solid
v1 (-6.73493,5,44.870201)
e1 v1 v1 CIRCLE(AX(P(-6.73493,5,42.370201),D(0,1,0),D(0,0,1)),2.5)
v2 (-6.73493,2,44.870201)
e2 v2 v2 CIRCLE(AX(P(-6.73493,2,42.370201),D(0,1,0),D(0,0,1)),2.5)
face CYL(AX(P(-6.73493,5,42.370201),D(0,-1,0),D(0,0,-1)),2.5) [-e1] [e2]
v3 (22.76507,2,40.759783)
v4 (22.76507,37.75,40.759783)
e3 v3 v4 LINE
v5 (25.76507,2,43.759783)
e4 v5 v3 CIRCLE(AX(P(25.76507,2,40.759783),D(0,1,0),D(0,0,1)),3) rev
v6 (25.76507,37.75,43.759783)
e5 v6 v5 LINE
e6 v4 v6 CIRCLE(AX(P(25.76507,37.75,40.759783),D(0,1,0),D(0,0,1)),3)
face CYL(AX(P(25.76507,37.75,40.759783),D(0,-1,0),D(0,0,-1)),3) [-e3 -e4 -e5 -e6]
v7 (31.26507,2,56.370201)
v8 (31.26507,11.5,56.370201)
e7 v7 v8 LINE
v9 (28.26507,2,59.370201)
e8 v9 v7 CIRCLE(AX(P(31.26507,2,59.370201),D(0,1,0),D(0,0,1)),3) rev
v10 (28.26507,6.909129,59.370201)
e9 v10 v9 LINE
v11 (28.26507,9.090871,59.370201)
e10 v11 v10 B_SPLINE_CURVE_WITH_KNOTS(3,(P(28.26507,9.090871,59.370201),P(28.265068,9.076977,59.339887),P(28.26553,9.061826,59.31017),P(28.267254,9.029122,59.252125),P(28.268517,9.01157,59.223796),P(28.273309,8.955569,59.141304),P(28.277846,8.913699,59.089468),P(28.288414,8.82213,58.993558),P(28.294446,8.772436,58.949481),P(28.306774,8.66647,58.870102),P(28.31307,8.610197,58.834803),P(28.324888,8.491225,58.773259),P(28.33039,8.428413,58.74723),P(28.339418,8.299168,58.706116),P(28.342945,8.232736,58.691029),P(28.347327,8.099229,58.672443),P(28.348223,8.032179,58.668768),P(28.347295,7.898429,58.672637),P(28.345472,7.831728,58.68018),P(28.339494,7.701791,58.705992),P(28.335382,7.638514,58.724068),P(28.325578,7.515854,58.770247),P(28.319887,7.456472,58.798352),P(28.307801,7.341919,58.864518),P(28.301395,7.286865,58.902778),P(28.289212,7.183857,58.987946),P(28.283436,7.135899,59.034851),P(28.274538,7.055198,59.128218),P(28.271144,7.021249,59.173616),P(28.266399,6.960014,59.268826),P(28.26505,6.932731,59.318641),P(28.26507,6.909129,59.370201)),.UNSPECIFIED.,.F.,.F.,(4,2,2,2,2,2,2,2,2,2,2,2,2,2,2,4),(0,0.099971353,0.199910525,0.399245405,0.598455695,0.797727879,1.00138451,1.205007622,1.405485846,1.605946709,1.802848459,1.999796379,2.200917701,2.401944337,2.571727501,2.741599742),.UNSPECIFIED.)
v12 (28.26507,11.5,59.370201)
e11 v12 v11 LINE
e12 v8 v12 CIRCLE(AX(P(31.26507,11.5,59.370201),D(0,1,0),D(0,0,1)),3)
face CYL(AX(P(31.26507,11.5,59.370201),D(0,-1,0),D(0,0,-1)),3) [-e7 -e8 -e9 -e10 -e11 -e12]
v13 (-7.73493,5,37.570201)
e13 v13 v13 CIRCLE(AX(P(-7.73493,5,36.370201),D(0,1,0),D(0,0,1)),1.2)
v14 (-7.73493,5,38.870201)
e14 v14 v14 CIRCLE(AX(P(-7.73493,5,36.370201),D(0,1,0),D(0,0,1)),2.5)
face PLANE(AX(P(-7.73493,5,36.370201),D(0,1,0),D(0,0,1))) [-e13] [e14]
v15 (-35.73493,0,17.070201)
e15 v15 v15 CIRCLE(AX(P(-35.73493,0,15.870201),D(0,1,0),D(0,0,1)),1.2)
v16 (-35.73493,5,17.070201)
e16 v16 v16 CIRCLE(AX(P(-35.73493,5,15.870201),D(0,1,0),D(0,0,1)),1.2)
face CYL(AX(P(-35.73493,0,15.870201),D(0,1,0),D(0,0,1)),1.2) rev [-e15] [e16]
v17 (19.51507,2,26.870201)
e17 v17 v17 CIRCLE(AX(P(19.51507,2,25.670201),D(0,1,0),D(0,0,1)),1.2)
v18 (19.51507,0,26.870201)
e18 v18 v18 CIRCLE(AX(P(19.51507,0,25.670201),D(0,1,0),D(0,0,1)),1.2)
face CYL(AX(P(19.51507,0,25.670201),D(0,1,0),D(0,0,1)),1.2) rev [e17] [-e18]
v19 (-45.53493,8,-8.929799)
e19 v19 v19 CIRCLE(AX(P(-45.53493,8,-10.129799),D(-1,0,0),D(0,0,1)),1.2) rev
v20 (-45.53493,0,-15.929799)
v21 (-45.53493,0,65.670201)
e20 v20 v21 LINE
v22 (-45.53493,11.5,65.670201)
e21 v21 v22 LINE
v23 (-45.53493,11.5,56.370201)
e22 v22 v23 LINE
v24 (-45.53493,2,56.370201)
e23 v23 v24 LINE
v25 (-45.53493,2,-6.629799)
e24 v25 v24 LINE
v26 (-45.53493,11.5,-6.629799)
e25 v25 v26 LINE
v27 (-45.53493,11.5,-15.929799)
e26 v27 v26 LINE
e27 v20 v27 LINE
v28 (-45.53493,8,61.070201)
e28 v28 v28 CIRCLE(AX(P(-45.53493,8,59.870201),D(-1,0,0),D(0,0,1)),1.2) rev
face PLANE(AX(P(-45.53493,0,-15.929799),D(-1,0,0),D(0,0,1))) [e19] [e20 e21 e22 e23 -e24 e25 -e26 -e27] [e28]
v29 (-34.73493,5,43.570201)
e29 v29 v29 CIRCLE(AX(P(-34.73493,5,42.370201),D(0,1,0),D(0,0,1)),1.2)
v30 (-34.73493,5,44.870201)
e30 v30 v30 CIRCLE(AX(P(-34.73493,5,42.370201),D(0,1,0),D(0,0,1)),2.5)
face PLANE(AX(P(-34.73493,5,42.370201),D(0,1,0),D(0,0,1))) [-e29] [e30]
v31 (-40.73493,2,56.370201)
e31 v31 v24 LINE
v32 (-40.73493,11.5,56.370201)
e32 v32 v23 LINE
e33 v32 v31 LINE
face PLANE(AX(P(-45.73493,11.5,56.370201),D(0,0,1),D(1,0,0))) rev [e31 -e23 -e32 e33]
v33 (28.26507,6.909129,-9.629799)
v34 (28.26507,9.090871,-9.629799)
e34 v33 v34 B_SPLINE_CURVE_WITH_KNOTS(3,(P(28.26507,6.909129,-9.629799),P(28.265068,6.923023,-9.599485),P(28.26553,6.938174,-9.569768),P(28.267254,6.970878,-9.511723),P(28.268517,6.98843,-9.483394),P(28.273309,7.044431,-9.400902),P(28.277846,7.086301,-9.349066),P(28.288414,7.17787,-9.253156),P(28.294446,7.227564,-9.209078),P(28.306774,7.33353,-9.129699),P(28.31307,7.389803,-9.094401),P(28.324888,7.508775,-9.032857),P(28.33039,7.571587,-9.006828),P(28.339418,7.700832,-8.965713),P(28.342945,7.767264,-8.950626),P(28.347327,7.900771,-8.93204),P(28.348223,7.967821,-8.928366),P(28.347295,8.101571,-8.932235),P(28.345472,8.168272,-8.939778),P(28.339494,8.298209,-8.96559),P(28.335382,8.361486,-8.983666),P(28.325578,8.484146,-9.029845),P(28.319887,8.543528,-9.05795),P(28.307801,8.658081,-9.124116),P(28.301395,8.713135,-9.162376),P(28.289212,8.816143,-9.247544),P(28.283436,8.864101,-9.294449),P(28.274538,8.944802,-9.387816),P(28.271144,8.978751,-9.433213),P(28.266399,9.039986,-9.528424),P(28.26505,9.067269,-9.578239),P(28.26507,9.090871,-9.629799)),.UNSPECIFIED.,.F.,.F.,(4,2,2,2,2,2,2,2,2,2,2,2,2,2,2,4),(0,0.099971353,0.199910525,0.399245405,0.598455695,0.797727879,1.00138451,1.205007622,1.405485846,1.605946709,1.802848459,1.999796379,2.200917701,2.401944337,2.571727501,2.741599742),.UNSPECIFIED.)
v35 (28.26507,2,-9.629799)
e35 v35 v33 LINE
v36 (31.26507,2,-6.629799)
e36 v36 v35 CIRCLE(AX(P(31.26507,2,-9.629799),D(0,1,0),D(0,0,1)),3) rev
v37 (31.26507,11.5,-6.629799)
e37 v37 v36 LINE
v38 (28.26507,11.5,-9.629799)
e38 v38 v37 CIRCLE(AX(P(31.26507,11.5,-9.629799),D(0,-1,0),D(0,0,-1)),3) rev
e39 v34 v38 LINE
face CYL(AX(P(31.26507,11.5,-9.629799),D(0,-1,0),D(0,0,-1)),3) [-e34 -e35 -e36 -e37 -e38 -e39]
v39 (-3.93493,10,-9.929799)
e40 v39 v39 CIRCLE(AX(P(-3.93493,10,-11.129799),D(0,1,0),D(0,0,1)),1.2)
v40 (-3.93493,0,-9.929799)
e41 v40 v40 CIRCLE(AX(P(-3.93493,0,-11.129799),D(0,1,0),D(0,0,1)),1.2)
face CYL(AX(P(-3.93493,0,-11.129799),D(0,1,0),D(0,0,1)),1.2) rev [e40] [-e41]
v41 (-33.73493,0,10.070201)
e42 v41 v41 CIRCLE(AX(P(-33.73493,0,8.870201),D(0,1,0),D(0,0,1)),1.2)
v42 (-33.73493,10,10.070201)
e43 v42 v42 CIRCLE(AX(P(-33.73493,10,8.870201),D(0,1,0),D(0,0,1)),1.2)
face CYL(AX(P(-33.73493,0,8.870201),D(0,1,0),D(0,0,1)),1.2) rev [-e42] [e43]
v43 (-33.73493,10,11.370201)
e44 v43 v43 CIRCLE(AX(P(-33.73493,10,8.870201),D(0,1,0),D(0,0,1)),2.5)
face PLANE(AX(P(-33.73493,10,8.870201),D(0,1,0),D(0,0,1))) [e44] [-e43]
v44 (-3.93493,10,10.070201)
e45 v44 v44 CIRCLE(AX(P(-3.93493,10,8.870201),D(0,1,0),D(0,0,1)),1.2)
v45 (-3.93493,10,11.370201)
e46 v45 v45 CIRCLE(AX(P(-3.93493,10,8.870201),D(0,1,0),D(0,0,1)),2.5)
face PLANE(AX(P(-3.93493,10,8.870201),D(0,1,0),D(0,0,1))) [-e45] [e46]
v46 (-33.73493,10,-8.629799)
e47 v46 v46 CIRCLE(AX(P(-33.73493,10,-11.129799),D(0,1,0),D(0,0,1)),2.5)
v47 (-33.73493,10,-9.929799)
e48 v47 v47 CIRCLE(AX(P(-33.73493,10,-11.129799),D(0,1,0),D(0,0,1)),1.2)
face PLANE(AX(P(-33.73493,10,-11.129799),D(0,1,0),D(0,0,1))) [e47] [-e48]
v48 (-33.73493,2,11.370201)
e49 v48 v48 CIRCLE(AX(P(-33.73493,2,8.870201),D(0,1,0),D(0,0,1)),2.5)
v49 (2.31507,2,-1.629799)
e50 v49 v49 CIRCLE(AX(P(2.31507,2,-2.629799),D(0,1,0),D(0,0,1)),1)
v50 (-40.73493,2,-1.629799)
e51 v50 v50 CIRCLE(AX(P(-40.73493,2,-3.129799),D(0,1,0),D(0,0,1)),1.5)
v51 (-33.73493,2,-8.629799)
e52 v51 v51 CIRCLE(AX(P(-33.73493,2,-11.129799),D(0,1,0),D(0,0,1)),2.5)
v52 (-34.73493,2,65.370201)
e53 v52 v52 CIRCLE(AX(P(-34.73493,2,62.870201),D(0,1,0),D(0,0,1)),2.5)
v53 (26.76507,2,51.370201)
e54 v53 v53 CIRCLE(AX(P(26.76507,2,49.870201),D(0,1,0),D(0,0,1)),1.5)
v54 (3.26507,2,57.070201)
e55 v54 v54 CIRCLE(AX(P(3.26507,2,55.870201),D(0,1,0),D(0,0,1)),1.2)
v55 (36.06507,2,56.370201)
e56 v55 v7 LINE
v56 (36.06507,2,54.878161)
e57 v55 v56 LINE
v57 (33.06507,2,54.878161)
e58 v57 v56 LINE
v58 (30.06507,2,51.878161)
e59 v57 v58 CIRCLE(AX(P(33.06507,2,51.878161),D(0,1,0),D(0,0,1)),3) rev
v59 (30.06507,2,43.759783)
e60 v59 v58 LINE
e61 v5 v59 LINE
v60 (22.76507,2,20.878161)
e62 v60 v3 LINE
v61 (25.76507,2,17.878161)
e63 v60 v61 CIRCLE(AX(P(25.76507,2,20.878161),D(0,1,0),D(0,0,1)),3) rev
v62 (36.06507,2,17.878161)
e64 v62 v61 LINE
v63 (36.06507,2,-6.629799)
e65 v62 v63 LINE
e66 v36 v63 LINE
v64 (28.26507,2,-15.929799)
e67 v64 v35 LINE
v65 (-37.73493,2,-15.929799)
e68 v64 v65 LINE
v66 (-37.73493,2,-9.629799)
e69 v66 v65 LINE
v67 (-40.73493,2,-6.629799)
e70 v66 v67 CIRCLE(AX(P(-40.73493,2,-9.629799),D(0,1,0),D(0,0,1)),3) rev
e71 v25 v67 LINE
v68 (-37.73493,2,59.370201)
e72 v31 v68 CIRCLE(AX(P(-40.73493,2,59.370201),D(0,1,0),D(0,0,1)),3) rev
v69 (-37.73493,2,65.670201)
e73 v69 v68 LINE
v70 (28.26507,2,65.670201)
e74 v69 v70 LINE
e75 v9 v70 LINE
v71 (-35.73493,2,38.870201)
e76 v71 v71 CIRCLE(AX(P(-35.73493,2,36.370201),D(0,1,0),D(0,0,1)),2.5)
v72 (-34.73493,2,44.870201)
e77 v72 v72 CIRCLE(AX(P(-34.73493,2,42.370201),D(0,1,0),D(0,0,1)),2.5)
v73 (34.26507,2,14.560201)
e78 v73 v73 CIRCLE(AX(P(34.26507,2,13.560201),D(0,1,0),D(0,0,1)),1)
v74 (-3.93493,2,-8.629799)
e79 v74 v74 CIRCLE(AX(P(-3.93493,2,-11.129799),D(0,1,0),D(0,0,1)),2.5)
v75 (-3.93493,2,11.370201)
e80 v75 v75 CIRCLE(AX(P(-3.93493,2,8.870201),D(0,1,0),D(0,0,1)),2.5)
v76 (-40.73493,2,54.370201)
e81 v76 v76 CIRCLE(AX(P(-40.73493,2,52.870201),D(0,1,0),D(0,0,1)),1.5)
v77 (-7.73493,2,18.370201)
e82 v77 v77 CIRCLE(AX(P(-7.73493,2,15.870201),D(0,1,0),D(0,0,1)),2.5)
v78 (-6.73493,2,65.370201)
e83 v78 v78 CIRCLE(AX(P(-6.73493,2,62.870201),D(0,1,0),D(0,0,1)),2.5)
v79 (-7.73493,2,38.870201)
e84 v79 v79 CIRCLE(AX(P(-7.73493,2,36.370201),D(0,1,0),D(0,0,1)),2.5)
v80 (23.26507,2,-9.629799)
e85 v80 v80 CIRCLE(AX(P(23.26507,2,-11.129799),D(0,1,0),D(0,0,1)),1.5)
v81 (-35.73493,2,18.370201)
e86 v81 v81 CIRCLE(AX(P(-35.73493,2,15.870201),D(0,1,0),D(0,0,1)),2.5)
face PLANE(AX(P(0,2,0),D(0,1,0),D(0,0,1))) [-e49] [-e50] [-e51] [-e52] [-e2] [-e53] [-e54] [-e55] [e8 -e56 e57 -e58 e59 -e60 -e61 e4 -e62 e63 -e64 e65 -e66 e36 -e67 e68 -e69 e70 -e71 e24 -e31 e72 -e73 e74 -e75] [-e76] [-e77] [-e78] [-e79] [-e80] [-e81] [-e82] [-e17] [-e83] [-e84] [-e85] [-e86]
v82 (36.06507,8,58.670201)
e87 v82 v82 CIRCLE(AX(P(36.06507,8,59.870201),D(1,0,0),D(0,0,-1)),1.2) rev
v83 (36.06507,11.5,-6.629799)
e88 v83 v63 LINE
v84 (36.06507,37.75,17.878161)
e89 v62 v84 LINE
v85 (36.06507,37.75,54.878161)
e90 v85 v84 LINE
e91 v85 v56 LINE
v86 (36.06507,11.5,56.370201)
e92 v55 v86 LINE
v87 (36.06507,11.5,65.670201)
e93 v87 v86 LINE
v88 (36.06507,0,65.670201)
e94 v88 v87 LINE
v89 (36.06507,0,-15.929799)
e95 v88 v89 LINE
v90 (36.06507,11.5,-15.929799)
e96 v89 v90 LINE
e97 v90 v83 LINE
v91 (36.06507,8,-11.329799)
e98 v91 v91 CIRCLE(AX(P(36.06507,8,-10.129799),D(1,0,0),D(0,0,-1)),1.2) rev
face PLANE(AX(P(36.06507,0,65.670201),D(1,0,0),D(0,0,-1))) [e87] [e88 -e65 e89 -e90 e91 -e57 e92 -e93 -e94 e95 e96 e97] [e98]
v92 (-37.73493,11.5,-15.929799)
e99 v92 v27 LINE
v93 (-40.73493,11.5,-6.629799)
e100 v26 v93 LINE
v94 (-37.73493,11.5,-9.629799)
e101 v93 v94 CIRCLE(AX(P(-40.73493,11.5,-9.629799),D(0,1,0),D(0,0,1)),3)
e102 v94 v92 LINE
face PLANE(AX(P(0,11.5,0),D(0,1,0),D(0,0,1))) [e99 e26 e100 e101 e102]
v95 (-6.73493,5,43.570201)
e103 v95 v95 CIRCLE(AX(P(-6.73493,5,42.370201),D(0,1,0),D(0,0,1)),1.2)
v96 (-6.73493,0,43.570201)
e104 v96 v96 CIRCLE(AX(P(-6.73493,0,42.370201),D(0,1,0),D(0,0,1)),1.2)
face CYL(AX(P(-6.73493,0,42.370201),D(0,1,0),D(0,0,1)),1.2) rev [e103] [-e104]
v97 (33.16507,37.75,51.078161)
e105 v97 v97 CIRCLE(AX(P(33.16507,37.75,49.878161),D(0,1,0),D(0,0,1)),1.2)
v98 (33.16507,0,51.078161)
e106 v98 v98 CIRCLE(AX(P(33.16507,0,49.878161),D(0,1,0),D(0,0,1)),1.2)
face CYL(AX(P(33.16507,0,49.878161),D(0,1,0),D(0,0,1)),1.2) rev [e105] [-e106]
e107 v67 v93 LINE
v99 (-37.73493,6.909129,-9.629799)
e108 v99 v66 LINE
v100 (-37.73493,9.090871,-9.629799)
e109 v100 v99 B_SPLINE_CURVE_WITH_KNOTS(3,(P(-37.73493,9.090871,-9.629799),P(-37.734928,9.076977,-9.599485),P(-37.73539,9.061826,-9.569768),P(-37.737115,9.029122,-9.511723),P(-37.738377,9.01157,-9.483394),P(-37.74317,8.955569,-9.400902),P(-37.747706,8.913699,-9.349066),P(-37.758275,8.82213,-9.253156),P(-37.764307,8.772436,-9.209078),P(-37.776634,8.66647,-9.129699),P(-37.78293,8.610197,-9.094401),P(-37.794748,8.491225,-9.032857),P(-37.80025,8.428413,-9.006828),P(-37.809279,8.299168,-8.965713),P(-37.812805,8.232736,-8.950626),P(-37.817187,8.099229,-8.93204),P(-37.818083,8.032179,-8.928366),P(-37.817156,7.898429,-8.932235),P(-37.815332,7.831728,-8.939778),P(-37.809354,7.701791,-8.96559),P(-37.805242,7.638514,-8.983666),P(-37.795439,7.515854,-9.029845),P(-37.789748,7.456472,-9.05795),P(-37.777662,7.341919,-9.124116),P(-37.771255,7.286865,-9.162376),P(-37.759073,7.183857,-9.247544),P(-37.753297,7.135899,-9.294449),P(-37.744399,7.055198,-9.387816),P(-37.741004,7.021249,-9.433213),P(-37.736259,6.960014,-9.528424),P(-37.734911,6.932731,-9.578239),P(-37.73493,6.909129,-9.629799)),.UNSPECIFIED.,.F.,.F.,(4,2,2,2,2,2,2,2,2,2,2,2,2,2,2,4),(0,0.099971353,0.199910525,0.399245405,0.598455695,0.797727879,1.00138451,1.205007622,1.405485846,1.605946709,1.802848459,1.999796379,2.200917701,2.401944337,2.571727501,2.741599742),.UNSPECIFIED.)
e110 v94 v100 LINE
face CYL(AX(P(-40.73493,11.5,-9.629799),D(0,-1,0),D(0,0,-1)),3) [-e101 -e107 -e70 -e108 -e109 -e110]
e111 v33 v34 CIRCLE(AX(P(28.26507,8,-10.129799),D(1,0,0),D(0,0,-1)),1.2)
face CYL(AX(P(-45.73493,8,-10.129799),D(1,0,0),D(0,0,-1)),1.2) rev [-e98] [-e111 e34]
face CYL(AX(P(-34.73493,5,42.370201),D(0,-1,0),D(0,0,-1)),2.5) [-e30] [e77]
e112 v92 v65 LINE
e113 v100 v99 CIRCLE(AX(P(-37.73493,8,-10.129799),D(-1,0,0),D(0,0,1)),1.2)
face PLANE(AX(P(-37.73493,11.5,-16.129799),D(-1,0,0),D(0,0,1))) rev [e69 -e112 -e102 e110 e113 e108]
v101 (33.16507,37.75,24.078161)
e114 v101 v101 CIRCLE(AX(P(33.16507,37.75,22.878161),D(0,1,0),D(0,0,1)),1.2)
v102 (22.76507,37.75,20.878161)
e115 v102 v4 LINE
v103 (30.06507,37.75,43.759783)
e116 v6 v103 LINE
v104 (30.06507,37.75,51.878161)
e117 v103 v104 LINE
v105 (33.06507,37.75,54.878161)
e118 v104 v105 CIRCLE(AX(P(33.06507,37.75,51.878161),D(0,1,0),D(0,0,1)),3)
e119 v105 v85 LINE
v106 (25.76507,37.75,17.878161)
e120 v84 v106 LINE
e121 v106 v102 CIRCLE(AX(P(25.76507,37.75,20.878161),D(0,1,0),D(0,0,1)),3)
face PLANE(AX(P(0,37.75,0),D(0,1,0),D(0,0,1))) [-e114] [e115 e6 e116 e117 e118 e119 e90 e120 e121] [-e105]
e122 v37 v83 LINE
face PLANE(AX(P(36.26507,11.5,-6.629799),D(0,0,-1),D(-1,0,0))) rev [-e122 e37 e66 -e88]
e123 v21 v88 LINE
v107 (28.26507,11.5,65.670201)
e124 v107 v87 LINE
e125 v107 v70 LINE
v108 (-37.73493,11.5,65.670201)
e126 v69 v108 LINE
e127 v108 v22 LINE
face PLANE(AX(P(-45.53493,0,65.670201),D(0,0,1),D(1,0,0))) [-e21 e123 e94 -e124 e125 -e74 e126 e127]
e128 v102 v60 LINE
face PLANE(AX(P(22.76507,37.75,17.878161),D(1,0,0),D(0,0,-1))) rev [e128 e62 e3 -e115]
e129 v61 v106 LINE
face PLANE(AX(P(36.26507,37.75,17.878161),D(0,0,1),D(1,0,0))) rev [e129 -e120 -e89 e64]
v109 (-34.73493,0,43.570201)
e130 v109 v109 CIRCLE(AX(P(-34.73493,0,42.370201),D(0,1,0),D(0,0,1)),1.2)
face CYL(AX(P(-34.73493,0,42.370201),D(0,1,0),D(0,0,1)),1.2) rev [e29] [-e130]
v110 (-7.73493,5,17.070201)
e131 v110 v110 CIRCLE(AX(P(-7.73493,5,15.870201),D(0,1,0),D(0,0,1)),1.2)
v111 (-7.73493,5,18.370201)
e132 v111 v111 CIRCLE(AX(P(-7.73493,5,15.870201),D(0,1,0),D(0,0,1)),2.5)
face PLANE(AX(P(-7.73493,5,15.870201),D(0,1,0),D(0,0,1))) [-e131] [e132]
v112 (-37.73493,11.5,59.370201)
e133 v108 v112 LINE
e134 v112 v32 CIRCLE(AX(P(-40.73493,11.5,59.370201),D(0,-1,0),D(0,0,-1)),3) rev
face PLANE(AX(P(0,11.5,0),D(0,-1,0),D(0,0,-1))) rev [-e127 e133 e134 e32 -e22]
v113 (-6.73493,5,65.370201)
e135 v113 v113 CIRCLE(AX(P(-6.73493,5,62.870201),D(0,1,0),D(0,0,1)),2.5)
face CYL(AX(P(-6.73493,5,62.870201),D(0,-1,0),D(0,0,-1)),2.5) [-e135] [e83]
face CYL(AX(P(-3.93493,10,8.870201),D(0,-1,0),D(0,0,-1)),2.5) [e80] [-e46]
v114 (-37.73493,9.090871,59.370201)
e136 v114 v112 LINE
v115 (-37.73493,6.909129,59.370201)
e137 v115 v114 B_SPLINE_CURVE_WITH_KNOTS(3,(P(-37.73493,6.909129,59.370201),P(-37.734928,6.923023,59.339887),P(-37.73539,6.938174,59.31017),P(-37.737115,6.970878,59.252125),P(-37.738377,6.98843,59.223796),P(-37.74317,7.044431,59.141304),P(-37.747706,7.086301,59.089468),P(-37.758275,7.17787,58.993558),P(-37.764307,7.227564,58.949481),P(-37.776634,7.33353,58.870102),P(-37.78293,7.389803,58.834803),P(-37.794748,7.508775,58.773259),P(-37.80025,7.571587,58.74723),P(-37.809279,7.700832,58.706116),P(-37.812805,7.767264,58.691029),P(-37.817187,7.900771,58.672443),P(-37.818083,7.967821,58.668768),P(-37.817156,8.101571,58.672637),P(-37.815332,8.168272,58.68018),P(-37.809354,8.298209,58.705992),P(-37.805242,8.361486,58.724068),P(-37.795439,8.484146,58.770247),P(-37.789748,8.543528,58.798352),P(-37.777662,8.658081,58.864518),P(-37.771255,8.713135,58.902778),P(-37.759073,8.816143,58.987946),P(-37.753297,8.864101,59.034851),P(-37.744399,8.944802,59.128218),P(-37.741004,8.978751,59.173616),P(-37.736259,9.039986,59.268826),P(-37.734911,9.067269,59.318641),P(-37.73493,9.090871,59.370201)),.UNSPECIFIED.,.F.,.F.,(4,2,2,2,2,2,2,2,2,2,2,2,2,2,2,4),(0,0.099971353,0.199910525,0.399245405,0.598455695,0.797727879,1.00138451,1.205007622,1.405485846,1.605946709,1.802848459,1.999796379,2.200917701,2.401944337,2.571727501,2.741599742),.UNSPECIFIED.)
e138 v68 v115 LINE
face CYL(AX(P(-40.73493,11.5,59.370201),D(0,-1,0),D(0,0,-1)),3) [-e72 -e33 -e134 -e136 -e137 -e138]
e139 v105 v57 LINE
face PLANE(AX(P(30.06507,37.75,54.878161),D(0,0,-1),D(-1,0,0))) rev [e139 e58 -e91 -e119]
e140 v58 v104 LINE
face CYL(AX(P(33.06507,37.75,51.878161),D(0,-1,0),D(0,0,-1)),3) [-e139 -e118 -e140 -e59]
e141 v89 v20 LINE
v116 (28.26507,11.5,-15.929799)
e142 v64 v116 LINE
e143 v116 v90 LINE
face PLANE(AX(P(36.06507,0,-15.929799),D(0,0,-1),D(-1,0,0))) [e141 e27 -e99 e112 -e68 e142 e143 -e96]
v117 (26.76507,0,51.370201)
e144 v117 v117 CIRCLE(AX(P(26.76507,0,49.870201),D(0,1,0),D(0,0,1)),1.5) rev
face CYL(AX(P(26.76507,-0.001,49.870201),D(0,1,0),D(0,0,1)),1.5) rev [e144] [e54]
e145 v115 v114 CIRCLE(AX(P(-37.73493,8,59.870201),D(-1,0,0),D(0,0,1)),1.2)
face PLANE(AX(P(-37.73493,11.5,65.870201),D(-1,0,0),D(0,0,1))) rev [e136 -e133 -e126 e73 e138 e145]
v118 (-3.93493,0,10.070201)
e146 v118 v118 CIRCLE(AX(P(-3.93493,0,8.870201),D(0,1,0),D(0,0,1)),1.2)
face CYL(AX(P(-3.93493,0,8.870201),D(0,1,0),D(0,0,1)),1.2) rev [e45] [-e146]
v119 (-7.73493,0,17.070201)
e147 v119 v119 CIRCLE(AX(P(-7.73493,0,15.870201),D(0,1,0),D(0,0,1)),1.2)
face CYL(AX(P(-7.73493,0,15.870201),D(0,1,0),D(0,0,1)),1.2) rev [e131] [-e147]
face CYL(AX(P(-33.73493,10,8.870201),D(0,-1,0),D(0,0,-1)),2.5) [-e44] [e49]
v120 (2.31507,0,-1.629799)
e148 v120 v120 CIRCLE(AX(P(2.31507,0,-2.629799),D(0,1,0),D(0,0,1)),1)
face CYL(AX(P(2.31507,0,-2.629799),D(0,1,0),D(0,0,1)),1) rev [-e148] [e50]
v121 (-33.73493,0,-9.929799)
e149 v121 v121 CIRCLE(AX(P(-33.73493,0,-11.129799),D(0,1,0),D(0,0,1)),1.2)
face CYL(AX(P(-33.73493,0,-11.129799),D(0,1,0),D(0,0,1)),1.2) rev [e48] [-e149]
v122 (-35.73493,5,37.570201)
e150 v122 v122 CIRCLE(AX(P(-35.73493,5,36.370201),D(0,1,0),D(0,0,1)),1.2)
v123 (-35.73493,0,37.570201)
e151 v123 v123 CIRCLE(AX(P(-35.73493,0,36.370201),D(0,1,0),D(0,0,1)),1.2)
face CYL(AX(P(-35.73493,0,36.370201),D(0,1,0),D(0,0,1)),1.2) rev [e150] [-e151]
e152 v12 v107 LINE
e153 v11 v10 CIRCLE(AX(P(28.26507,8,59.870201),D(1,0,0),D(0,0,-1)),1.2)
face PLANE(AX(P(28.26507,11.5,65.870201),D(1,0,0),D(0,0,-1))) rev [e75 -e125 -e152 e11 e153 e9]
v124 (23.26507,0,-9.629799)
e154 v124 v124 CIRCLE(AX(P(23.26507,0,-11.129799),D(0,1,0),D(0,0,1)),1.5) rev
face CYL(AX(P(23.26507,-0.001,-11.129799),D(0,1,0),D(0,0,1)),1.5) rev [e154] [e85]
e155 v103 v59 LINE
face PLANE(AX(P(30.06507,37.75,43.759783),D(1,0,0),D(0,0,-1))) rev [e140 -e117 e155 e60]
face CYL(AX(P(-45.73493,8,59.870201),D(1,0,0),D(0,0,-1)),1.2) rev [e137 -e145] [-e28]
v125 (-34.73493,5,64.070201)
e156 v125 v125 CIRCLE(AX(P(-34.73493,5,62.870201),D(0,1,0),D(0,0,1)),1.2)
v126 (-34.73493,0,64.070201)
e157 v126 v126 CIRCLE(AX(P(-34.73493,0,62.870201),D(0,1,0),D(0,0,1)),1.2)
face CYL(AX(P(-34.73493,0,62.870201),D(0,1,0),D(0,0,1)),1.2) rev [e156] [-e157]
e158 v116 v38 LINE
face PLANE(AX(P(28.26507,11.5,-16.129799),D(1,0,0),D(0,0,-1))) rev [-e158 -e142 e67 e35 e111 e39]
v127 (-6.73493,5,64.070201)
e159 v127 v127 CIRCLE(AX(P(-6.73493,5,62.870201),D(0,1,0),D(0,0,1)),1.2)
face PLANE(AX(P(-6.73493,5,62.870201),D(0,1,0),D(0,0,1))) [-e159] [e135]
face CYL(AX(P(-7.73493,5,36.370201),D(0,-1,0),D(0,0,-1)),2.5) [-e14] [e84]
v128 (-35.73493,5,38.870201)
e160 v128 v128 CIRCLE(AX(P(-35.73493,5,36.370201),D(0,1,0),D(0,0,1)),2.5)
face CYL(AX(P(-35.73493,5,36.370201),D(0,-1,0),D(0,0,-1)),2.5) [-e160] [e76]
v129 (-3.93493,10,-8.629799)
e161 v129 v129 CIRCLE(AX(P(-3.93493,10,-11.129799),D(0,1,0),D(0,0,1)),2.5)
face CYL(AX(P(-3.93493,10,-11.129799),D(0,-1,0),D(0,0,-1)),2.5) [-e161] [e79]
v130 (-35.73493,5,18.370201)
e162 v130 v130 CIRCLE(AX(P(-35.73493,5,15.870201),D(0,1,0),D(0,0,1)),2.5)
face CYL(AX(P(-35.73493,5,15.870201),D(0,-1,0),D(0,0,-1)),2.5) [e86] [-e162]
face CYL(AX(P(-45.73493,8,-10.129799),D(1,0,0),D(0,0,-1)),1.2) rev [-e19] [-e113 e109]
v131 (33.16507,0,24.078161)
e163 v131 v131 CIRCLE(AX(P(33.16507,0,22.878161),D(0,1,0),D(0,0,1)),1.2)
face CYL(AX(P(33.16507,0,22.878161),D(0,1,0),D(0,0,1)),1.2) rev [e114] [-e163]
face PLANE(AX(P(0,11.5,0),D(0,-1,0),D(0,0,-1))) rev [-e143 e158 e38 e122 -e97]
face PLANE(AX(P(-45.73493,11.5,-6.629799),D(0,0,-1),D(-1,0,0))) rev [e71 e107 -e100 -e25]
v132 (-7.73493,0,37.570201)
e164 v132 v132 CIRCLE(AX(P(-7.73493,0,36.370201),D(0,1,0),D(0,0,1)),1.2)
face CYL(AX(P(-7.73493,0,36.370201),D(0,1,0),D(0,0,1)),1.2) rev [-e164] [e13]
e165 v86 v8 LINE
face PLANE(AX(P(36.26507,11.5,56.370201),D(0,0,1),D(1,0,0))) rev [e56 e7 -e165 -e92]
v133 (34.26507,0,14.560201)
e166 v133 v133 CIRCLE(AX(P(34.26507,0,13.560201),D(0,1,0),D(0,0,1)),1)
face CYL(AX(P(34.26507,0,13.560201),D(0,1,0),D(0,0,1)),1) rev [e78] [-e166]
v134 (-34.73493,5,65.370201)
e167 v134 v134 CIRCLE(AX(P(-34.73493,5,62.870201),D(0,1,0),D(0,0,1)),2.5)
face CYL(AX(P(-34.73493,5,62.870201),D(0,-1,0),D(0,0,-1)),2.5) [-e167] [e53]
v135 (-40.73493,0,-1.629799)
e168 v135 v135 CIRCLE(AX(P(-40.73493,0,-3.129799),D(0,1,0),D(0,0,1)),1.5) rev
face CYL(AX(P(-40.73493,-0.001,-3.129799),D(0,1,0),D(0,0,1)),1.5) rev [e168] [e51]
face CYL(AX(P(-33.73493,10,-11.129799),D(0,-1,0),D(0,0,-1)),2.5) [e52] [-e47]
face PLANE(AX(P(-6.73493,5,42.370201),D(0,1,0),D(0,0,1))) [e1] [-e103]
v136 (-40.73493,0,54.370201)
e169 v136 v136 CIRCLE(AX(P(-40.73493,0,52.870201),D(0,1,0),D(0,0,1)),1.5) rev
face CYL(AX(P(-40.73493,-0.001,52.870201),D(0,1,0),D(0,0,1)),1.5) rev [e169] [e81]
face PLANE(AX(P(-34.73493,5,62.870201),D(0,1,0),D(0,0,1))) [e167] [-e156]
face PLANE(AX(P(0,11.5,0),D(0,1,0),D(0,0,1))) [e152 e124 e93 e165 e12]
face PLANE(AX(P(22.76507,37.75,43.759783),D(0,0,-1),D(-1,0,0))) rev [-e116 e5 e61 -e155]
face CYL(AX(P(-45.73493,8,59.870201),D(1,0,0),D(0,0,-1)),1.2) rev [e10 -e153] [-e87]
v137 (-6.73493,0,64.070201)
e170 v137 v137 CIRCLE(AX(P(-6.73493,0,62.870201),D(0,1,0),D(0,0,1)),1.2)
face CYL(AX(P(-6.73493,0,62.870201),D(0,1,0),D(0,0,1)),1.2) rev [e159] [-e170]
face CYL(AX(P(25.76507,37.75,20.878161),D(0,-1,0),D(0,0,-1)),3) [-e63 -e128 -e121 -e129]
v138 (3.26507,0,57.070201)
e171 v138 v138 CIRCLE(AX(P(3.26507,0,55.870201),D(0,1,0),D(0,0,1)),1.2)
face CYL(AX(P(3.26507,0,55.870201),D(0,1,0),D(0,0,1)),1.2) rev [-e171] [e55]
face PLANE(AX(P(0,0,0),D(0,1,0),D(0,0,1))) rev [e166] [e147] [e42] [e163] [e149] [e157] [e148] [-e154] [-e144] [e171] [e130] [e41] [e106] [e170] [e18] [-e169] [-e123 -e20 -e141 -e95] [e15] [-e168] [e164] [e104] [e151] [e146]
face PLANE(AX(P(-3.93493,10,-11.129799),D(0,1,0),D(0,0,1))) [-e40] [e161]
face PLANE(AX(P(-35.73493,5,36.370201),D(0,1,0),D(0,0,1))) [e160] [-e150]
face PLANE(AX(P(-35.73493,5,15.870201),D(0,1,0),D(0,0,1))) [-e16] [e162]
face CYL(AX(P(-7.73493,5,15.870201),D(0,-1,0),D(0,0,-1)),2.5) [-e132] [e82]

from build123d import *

# Parameters (mm, degrees)
SKETCH_1_W               = 82
SKETCH_1_H               = 82
EXTRUDE_1_DEPTH          = 2
CUT_EXTRUDE_2_DEPTH      = 81.215754284
CUT_EXTRUDE_2_DEPTH_BACK = 81.215754284
SKETCH_3_R               = 1.2
CUT_EXTRUDE_3_DEPTH      = 81.215754284
CUT_EXTRUDE_3_DEPTH_BACK = 81.215754284
SKETCH_3_3_R             = 1.2
SKETCH_3_3_R_2           = 1
EXTRUDE_START            = 35.75
SKETCH_4_R               = 1.2
EXTRUDE_2_DEPTH          = 35.75
CUT_EXTRUDE_4_REACH      = 89.799
SKETCH_5_R               = 1.5
SKETCH_7_W               = 8
SKETCH_7_H               = 9.5
EXTRUDE_3_DEPTH          = 9.5
SKETCH_8_R               = 1.2
CUT_EXTRUDE_5_DEPTH      = 112.749478265
CUT_EXTRUDE_6_DEPTH      = 88.798802585
CUT_EXTRUDE_6_DEPTH_BACK = 88.798802585
SKETCH_9_W               = 82
SKETCH_9_H               = 82
SKETCH_9_W_2             = 81.6
SKETCH_9_H_2             = 81.6
EXTRUDE_START_2          = 8
SKETCH_10_R              = 2.5
SKETCH_10_R_2            = 1.2
EXTRUDE_4_DEPTH          = 8
EXTRUDE_START_3          = 3
SKETCH_11_R              = 2.5
SKETCH_11_R_2            = 1.2
EXTRUDE_5_DEPTH          = 3
FILLET_1_R               = 3


with BuildPart() as part:
    # 草圖1 → 填料-伸長1 (new body)
    with BuildSketch(Plane(origin=(0, 0, 0), x_dir=(1, 0, 0), z_dir=(0, 1, 0))):
        with Locations((-4.734930226, -24.870201097)):
            Rectangle(SKETCH_1_W, SKETCH_1_H)
    extrude(amount=EXTRUDE_1_DEPTH)

    # 草圖3 → 除料-伸長2 (cut, two sides: drawn at the far end of the back side and taken through both)
    with BuildSketch(Plane(origin=(0, 2, 0), x_dir=(1, 0, 0), z_dir=(0, 1, 0)).offset(-CUT_EXTRUDE_2_DEPTH_BACK)):
        with Locations(Location((-33.734930226, 11.129798903, 0), (0, 0, 270))):
            Circle(SKETCH_3_R)
        with Locations(Location((-3.934930226, 11.129798903, 0), (0, 0, 270))):
            Circle(SKETCH_3_R)
        with Locations(Location((-33.734930226, -8.870201097, 0), (0, 0, 270))):
            Circle(SKETCH_3_R)
        with Locations(Location((-3.934930226, -8.870201097, 0), (0, 0, 270))):
            Circle(SKETCH_3_R)
    extrude(amount=CUT_EXTRUDE_2_DEPTH + CUT_EXTRUDE_2_DEPTH_BACK, mode=Mode.SUBTRACT)

    # 草圖3<3> → 除料-伸長3 (cut, two sides: drawn at the far end of the back side and taken through both)
    with BuildSketch(Plane(origin=(0, 2, 0), x_dir=(1, 0, 0), z_dir=(0, 1, 0)).offset(-CUT_EXTRUDE_3_DEPTH_BACK)):
        with Locations(Location((3.265069774, -55.870201097, 0), (0, 0, 270))):
            Circle(SKETCH_3_3_R)
        with Locations(Location((19.515069774, -25.670201097, 0), (0, 0, 270))):
            Circle(SKETCH_3_3_R)
        with Locations(Location((-33.734930226, 11.129798903, 0), (0, 0, 270))):
            Circle(SKETCH_3_3_R)
        with Locations(Location((-3.934930226, 11.129798903, 0), (0, 0, 270))):
            Circle(SKETCH_3_3_R)
        with Locations(Location((-33.734930226, -8.870201097, 0), (0, 0, 270))):
            Circle(SKETCH_3_3_R)
        with Locations(Location((-3.934930226, -8.870201097, 0), (0, 0, 270))):
            Circle(SKETCH_3_3_R)
        with Locations(Location((2.315069774, 2.629798903, 0), (0, 0, 270))):
            Circle(SKETCH_3_3_R_2)
        with Locations(Location((-7.734930226, -15.870201097, 0), (0, 0, 270))):
            Circle(SKETCH_3_3_R)
        with Locations(Location((-35.734930226, -15.870201097, 0), (0, 0, 270))):
            Circle(SKETCH_3_3_R)
        with Locations(Location((-7.734930226, -36.370201097, 0), (0, 0, 270))):
            Circle(SKETCH_3_3_R)
        with Locations(Location((-35.734930226, -36.370201097, 0), (0, 0, 270))):
            Circle(SKETCH_3_3_R)
        with Locations(Location((-6.734930226, -42.370201097, 0), (0, 0, 270))):
            Circle(SKETCH_3_3_R)
        with Locations(Location((-6.734930226, -62.870201097, 0), (0, 0, 270))):
            Circle(SKETCH_3_3_R)
        with Locations(Location((-34.734930226, -42.370201097, 0), (0, 0, 270))):
            Circle(SKETCH_3_3_R)
        with Locations(Location((-34.734930226, -62.870201097, 0), (0, 0, 270))):
            Circle(SKETCH_3_3_R)
        with Locations(Location((34.265069774, -13.560201097, 0), (0, 0, 270))):
            Circle(SKETCH_3_3_R_2)
        with Locations(Location((33.165069774, -22.878161185, 0), (0, 0, 270))):
            Circle(SKETCH_3_3_R)
        with Locations(Location((33.165069774, -49.878161185, 0), (0, 0, 270))):
            Circle(SKETCH_3_3_R)
    extrude(amount=CUT_EXTRUDE_3_DEPTH + CUT_EXTRUDE_3_DEPTH_BACK, mode=Mode.SUBTRACT)

    # 草圖4 → 填料-伸長2 (add)
    with BuildSketch(Plane(origin=(0, 2, 0), x_dir=(1, 0, 0), z_dir=(0, 1, 0)).offset(EXTRUDE_START)):
        Polygon((36.265069774, -17.878161185), (22.765069774, -17.878161185), (22.765069774, -43.759782879), (30.065069774, -43.759782879), (30.065069774, -54.878161185), (36.265069774, -54.878161185), align=None)
        with Locations(Location((33.165069774, -22.878161185, 0), (0, 0, 270))):
            Circle(SKETCH_4_R, mode=Mode.SUBTRACT)
        with Locations(Location((33.165069774, -49.878161185, 0), (0, 0, 270))):
            Circle(SKETCH_4_R, mode=Mode.SUBTRACT)
    extrude(amount=-EXTRUDE_2_DEPTH)

    # 草圖5 → 除料-伸長4 (cut, up to next)
    with BuildSketch(Plane(origin=(0, 2, 0), x_dir=(1, 0, 0), z_dir=(0, 1, 0)), mode=Mode.PRIVATE) as cut_extrude_4_sk1:
        with Locations(Location((26.765069774, -49.870201097, 0), (0, 0, 270))):
            Circle(SKETCH_5_R)
    cut_extrude_4_tool1 = extrude(cut_extrude_4_sk1.sketch, amount=-CUT_EXTRUDE_4_REACH, mode=Mode.PRIVATE) & part.part
    # 草圖5 → 除料-伸長4 (cut, up to next)
    with BuildSketch(Plane(origin=(0, 2, 0), x_dir=(1, 0, 0), z_dir=(0, 1, 0)), mode=Mode.PRIVATE) as cut_extrude_4_sk2:
        with Locations(Location((23.265069774, 11.129798903, 0), (0, 0, 270))):
            Circle(SKETCH_5_R)
    cut_extrude_4_tool2 = extrude(cut_extrude_4_sk2.sketch, amount=-CUT_EXTRUDE_4_REACH, mode=Mode.PRIVATE) & part.part
    # 草圖5 → 除料-伸長4 (cut, up to next)
    with BuildSketch(Plane(origin=(0, 2, 0), x_dir=(1, 0, 0), z_dir=(0, 1, 0)), mode=Mode.PRIVATE) as cut_extrude_4_sk3:
        with Locations(Location((-40.734930226, 3.129798903, 0), (0, 0, 270))):
            Circle(SKETCH_5_R)
    cut_extrude_4_tool3 = extrude(cut_extrude_4_sk3.sketch, amount=-CUT_EXTRUDE_4_REACH, mode=Mode.PRIVATE) & part.part
    # 草圖5 → 除料-伸長4 (cut, up to next)
    with BuildSketch(Plane(origin=(0, 2, 0), x_dir=(1, 0, 0), z_dir=(0, 1, 0)), mode=Mode.PRIVATE) as cut_extrude_4_sk4:
        with Locations(Location((-40.734930226, -52.870201097, 0), (0, 0, 270))):
            Circle(SKETCH_5_R)
    cut_extrude_4_tool4 = extrude(cut_extrude_4_sk4.sketch, amount=-CUT_EXTRUDE_4_REACH, mode=Mode.PRIVATE) & part.part
    add(cut_extrude_4_tool1.solids().sort_by_distance((26.76507, 2, 49.870201))[0], mode=Mode.SUBTRACT)
    add(cut_extrude_4_tool2.solids().sort_by_distance((23.26507, 2, -11.129799))[0], mode=Mode.SUBTRACT)
    add(cut_extrude_4_tool3.solids().sort_by_distance((-40.73493, 2, -3.129799))[0], mode=Mode.SUBTRACT)
    add(cut_extrude_4_tool4.solids().sort_by_distance((-40.73493, 2, 52.870201))[0], mode=Mode.SUBTRACT)

    # 草圖7 → 填料-伸長3 (add)
    with BuildSketch(Plane(origin=(0, 2, 0), x_dir=(1, 0, 0), z_dir=(0, 1, 0))):
        with Locations((-41.734930226, 11.379798903)):
            Rectangle(SKETCH_7_W, SKETCH_7_H)
        with Locations((32.265069774, 11.379798903)):
            Rectangle(SKETCH_7_W, SKETCH_7_H)
        with Locations((32.265069774, -61.120201097)):
            Rectangle(SKETCH_7_W, SKETCH_7_H)
        with Locations((-41.734930226, -61.120201097)):
            Rectangle(SKETCH_7_W, SKETCH_7_H)
    extrude(amount=EXTRUDE_3_DEPTH)

    # 草圖8 → 除料-伸長5 (cut, through all)
    with BuildSketch(Plane(origin=(36.265069774, 0, 0), x_dir=(0, 0, -1), z_dir=(1, 0, 0))):
        with Locations((-59.870201097, 8)):
            Circle(SKETCH_8_R)
        with Locations((10.129798903, 8)):
            Circle(SKETCH_8_R)
    extrude(amount=-CUT_EXTRUDE_5_DEPTH, mode=Mode.SUBTRACT)

    # 草圖9 → 除料-伸長6 (cut, two sides: drawn at the far end of the back side and taken through both)
    with BuildSketch(Plane(origin=(0, 2, 0), x_dir=(1, 0, 0), z_dir=(0, 1, 0)).offset(-CUT_EXTRUDE_6_DEPTH_BACK)):
        with Locations((-4.734930226, -24.870201097)):
            Rectangle(SKETCH_9_W, SKETCH_9_H)
        with Locations((-4.734930226, -24.870201097)):
            Rectangle(SKETCH_9_W_2, SKETCH_9_H_2, mode=Mode.SUBTRACT)
    extrude(amount=CUT_EXTRUDE_6_DEPTH + CUT_EXTRUDE_6_DEPTH_BACK, mode=Mode.SUBTRACT)

    # 草圖10 → 填料-伸長4 (add)
    # profile 1 of 4: a face of its own
    with BuildSketch(Plane(origin=(0, 2, 0), x_dir=(1, 0, 0), z_dir=(0, 1, 0)).offset(EXTRUDE_START_2)):
        with Locations(Location((-33.734930226, 11.129798903, 0), (0, 0, 270))):
            Circle(SKETCH_10_R)
        with Locations(Location((-33.734930226, 11.129798903, 0), (0, 0, 270))):
            Circle(SKETCH_10_R_2, mode=Mode.SUBTRACT)
    # profile 2 of 4: a face of its own
    with BuildSketch(Plane(origin=(0, 2, 0), x_dir=(1, 0, 0), z_dir=(0, 1, 0)).offset(EXTRUDE_START_2)):
        with Locations(Location((-3.934930226, 11.129798903, 0), (0, 0, 270))):
            Circle(SKETCH_10_R)
        with Locations(Location((-3.934930226, 11.129798903, 0), (0, 0, 270))):
            Circle(SKETCH_10_R_2, mode=Mode.SUBTRACT)
    # profile 3 of 4: a face of its own
    with BuildSketch(Plane(origin=(0, 2, 0), x_dir=(1, 0, 0), z_dir=(0, 1, 0)).offset(EXTRUDE_START_2)):
        with Locations(Location((-33.734930226, -8.870201097, 0), (0, 0, 270))):
            Circle(SKETCH_10_R)
        with Locations(Location((-33.734930226, -8.870201097, 0), (0, 0, 270))):
            Circle(SKETCH_10_R_2, mode=Mode.SUBTRACT)
    # profile 4 of 4: a face of its own
    with BuildSketch(Plane(origin=(0, 2, 0), x_dir=(1, 0, 0), z_dir=(0, 1, 0)).offset(EXTRUDE_START_2)):
        with Locations(Location((-3.934930226, -8.870201097, 0), (0, 0, 270))):
            Circle(SKETCH_10_R)
        with Locations(Location((-3.934930226, -8.870201097, 0), (0, 0, 270))):
            Circle(SKETCH_10_R_2, mode=Mode.SUBTRACT)
    extrude(amount=-EXTRUDE_4_DEPTH)

    # 草圖11 → 填料-伸長5 (add)
    # profile 1 of 8: a face of its own
    with BuildSketch(Plane(origin=(0, 2, 0), x_dir=(1, 0, 0), z_dir=(0, 1, 0)).offset(EXTRUDE_START_3)):
        with Locations(Location((-35.734930226, -15.870201097, 0), (0, 0, 270))):
            Circle(SKETCH_11_R)
        with Locations(Location((-35.734930226, -15.870201097, 0), (0, 0, 270))):
            Circle(SKETCH_11_R_2, mode=Mode.SUBTRACT)
    # profile 2 of 8: a face of its own
    with BuildSketch(Plane(origin=(0, 2, 0), x_dir=(1, 0, 0), z_dir=(0, 1, 0)).offset(EXTRUDE_START_3)):
        with Locations(Location((-7.734930226, -15.870201097, 0), (0, 0, 270))):
            Circle(SKETCH_11_R)
        with Locations(Location((-7.734930226, -15.870201097, 0), (0, 0, 270))):
            Circle(SKETCH_11_R_2, mode=Mode.SUBTRACT)
    # profile 3 of 8: a face of its own
    with BuildSketch(Plane(origin=(0, 2, 0), x_dir=(1, 0, 0), z_dir=(0, 1, 0)).offset(EXTRUDE_START_3)):
        with Locations(Location((-35.734930226, -36.370201097, 0), (0, 0, 270))):
            Circle(SKETCH_11_R)
        with Locations(Location((-35.734930226, -36.370201097, 0), (0, 0, 270))):
            Circle(SKETCH_11_R_2, mode=Mode.SUBTRACT)
    # profile 4 of 8: a face of its own
    with BuildSketch(Plane(origin=(0, 2, 0), x_dir=(1, 0, 0), z_dir=(0, 1, 0)).offset(EXTRUDE_START_3)):
        with Locations(Location((-7.734930226, -36.370201097, 0), (0, 0, 270))):
            Circle(SKETCH_11_R)
        with Locations(Location((-7.734930226, -36.370201097, 0), (0, 0, 270))):
            Circle(SKETCH_11_R_2, mode=Mode.SUBTRACT)
    # profile 5 of 8: a face of its own
    with BuildSketch(Plane(origin=(0, 2, 0), x_dir=(1, 0, 0), z_dir=(0, 1, 0)).offset(EXTRUDE_START_3)):
        with Locations(Location((-34.734930226, -42.370201097, 0), (0, 0, 270))):
            Circle(SKETCH_11_R)
        with Locations(Location((-34.734930226, -42.370201097, 0), (0, 0, 270))):
            Circle(SKETCH_11_R_2, mode=Mode.SUBTRACT)
    # profile 6 of 8: a face of its own
    with BuildSketch(Plane(origin=(0, 2, 0), x_dir=(1, 0, 0), z_dir=(0, 1, 0)).offset(EXTRUDE_START_3)):
        with Locations(Location((-6.734930226, -42.370201097, 0), (0, 0, 270))):
            Circle(SKETCH_11_R)
        with Locations(Location((-6.734930226, -42.370201097, 0), (0, 0, 270))):
            Circle(SKETCH_11_R_2, mode=Mode.SUBTRACT)
    # profile 7 of 8: a face of its own
    with BuildSketch(Plane(origin=(0, 2, 0), x_dir=(1, 0, 0), z_dir=(0, 1, 0)).offset(EXTRUDE_START_3)):
        with Locations(Location((-34.734930226, -62.870201097, 0), (0, 0, 270))):
            Circle(SKETCH_11_R)
        with Locations(Location((-34.734930226, -62.870201097, 0), (0, 0, 270))):
            Circle(SKETCH_11_R_2, mode=Mode.SUBTRACT)
    # profile 8 of 8: a face of its own
    with BuildSketch(Plane(origin=(0, 2, 0), x_dir=(1, 0, 0), z_dir=(0, 1, 0)).offset(EXTRUDE_START_3)):
        with Locations(Location((-6.734930226, -62.870201097, 0), (0, 0, 270))):
            Circle(SKETCH_11_R)
        with Locations(Location((-6.734930226, -62.870201097, 0), (0, 0, 270))):
            Circle(SKETCH_11_R_2, mode=Mode.SUBTRACT)
    extrude(amount=-EXTRUDE_5_DEPTH)

    # 圓角1
    # the kernel refuses this fillet: 3 mm, written as the material it takes off along each edge
    with BuildSketch(Plane(origin=(22.765069774, 45.25, 17.878161185), x_dir=(1, 0, 0), z_dir=(0, -1, 0)), Plane(origin=(22.765069774, 45.25, 43.759782879), x_dir=(0, 0, -1), z_dir=(0, -1, 0)), Plane(origin=(30.065069774, 45.25, 54.878161185), x_dir=(0, 0, -1), z_dir=(0, -1, 0))) as fillet_1_piece_1:
        with BuildLine():
            CenterArc((FILLET_1_R, FILLET_1_R), FILLET_1_R, 180, 90)
            Line((0, FILLET_1_R), (0, 0))
            Line((0, 0), (FILLET_1_R, 0))
        make_face()
    extrude(amount=43.25, mode=Mode.SUBTRACT)
    with BuildSketch(Plane(origin=(-37.734930226, 2, -6.629798903), x_dir=(0, 0, -1), z_dir=(0, 1, 0)), Plane(origin=(28.265069774, 2, -6.629798903), x_dir=(1, 0, 0), z_dir=(0, 1, 0)), Plane(origin=(-37.734930226, 2, 56.370201097), x_dir=(-1, 0, 0), z_dir=(0, 1, 0))) as fillet_1_piece_2:
        with BuildLine():
            CenterArc((FILLET_1_R, FILLET_1_R), FILLET_1_R, 180, 90)
            Line((0, FILLET_1_R), (0, 0))
            Line((0, 0), (FILLET_1_R, 0))
        make_face()
    extrude(amount=17, mode=Mode.SUBTRACT)
    with BuildSketch(Plane(origin=(28.265069774, 2, 56.370201097), x_dir=(1, 0, 0), z_dir=(0, 1, 0))) as fillet_1_piece_3:
        with BuildLine():
            CenterArc((FILLET_1_R, -FILLET_1_R), FILLET_1_R, 90, 90)
            Line((0, -FILLET_1_R), (0, 0))
            Line((0, 0), (FILLET_1_R, 0))
        make_face()
    extrude(amount=17, mode=Mode.SUBTRACT)


solid = part.part
